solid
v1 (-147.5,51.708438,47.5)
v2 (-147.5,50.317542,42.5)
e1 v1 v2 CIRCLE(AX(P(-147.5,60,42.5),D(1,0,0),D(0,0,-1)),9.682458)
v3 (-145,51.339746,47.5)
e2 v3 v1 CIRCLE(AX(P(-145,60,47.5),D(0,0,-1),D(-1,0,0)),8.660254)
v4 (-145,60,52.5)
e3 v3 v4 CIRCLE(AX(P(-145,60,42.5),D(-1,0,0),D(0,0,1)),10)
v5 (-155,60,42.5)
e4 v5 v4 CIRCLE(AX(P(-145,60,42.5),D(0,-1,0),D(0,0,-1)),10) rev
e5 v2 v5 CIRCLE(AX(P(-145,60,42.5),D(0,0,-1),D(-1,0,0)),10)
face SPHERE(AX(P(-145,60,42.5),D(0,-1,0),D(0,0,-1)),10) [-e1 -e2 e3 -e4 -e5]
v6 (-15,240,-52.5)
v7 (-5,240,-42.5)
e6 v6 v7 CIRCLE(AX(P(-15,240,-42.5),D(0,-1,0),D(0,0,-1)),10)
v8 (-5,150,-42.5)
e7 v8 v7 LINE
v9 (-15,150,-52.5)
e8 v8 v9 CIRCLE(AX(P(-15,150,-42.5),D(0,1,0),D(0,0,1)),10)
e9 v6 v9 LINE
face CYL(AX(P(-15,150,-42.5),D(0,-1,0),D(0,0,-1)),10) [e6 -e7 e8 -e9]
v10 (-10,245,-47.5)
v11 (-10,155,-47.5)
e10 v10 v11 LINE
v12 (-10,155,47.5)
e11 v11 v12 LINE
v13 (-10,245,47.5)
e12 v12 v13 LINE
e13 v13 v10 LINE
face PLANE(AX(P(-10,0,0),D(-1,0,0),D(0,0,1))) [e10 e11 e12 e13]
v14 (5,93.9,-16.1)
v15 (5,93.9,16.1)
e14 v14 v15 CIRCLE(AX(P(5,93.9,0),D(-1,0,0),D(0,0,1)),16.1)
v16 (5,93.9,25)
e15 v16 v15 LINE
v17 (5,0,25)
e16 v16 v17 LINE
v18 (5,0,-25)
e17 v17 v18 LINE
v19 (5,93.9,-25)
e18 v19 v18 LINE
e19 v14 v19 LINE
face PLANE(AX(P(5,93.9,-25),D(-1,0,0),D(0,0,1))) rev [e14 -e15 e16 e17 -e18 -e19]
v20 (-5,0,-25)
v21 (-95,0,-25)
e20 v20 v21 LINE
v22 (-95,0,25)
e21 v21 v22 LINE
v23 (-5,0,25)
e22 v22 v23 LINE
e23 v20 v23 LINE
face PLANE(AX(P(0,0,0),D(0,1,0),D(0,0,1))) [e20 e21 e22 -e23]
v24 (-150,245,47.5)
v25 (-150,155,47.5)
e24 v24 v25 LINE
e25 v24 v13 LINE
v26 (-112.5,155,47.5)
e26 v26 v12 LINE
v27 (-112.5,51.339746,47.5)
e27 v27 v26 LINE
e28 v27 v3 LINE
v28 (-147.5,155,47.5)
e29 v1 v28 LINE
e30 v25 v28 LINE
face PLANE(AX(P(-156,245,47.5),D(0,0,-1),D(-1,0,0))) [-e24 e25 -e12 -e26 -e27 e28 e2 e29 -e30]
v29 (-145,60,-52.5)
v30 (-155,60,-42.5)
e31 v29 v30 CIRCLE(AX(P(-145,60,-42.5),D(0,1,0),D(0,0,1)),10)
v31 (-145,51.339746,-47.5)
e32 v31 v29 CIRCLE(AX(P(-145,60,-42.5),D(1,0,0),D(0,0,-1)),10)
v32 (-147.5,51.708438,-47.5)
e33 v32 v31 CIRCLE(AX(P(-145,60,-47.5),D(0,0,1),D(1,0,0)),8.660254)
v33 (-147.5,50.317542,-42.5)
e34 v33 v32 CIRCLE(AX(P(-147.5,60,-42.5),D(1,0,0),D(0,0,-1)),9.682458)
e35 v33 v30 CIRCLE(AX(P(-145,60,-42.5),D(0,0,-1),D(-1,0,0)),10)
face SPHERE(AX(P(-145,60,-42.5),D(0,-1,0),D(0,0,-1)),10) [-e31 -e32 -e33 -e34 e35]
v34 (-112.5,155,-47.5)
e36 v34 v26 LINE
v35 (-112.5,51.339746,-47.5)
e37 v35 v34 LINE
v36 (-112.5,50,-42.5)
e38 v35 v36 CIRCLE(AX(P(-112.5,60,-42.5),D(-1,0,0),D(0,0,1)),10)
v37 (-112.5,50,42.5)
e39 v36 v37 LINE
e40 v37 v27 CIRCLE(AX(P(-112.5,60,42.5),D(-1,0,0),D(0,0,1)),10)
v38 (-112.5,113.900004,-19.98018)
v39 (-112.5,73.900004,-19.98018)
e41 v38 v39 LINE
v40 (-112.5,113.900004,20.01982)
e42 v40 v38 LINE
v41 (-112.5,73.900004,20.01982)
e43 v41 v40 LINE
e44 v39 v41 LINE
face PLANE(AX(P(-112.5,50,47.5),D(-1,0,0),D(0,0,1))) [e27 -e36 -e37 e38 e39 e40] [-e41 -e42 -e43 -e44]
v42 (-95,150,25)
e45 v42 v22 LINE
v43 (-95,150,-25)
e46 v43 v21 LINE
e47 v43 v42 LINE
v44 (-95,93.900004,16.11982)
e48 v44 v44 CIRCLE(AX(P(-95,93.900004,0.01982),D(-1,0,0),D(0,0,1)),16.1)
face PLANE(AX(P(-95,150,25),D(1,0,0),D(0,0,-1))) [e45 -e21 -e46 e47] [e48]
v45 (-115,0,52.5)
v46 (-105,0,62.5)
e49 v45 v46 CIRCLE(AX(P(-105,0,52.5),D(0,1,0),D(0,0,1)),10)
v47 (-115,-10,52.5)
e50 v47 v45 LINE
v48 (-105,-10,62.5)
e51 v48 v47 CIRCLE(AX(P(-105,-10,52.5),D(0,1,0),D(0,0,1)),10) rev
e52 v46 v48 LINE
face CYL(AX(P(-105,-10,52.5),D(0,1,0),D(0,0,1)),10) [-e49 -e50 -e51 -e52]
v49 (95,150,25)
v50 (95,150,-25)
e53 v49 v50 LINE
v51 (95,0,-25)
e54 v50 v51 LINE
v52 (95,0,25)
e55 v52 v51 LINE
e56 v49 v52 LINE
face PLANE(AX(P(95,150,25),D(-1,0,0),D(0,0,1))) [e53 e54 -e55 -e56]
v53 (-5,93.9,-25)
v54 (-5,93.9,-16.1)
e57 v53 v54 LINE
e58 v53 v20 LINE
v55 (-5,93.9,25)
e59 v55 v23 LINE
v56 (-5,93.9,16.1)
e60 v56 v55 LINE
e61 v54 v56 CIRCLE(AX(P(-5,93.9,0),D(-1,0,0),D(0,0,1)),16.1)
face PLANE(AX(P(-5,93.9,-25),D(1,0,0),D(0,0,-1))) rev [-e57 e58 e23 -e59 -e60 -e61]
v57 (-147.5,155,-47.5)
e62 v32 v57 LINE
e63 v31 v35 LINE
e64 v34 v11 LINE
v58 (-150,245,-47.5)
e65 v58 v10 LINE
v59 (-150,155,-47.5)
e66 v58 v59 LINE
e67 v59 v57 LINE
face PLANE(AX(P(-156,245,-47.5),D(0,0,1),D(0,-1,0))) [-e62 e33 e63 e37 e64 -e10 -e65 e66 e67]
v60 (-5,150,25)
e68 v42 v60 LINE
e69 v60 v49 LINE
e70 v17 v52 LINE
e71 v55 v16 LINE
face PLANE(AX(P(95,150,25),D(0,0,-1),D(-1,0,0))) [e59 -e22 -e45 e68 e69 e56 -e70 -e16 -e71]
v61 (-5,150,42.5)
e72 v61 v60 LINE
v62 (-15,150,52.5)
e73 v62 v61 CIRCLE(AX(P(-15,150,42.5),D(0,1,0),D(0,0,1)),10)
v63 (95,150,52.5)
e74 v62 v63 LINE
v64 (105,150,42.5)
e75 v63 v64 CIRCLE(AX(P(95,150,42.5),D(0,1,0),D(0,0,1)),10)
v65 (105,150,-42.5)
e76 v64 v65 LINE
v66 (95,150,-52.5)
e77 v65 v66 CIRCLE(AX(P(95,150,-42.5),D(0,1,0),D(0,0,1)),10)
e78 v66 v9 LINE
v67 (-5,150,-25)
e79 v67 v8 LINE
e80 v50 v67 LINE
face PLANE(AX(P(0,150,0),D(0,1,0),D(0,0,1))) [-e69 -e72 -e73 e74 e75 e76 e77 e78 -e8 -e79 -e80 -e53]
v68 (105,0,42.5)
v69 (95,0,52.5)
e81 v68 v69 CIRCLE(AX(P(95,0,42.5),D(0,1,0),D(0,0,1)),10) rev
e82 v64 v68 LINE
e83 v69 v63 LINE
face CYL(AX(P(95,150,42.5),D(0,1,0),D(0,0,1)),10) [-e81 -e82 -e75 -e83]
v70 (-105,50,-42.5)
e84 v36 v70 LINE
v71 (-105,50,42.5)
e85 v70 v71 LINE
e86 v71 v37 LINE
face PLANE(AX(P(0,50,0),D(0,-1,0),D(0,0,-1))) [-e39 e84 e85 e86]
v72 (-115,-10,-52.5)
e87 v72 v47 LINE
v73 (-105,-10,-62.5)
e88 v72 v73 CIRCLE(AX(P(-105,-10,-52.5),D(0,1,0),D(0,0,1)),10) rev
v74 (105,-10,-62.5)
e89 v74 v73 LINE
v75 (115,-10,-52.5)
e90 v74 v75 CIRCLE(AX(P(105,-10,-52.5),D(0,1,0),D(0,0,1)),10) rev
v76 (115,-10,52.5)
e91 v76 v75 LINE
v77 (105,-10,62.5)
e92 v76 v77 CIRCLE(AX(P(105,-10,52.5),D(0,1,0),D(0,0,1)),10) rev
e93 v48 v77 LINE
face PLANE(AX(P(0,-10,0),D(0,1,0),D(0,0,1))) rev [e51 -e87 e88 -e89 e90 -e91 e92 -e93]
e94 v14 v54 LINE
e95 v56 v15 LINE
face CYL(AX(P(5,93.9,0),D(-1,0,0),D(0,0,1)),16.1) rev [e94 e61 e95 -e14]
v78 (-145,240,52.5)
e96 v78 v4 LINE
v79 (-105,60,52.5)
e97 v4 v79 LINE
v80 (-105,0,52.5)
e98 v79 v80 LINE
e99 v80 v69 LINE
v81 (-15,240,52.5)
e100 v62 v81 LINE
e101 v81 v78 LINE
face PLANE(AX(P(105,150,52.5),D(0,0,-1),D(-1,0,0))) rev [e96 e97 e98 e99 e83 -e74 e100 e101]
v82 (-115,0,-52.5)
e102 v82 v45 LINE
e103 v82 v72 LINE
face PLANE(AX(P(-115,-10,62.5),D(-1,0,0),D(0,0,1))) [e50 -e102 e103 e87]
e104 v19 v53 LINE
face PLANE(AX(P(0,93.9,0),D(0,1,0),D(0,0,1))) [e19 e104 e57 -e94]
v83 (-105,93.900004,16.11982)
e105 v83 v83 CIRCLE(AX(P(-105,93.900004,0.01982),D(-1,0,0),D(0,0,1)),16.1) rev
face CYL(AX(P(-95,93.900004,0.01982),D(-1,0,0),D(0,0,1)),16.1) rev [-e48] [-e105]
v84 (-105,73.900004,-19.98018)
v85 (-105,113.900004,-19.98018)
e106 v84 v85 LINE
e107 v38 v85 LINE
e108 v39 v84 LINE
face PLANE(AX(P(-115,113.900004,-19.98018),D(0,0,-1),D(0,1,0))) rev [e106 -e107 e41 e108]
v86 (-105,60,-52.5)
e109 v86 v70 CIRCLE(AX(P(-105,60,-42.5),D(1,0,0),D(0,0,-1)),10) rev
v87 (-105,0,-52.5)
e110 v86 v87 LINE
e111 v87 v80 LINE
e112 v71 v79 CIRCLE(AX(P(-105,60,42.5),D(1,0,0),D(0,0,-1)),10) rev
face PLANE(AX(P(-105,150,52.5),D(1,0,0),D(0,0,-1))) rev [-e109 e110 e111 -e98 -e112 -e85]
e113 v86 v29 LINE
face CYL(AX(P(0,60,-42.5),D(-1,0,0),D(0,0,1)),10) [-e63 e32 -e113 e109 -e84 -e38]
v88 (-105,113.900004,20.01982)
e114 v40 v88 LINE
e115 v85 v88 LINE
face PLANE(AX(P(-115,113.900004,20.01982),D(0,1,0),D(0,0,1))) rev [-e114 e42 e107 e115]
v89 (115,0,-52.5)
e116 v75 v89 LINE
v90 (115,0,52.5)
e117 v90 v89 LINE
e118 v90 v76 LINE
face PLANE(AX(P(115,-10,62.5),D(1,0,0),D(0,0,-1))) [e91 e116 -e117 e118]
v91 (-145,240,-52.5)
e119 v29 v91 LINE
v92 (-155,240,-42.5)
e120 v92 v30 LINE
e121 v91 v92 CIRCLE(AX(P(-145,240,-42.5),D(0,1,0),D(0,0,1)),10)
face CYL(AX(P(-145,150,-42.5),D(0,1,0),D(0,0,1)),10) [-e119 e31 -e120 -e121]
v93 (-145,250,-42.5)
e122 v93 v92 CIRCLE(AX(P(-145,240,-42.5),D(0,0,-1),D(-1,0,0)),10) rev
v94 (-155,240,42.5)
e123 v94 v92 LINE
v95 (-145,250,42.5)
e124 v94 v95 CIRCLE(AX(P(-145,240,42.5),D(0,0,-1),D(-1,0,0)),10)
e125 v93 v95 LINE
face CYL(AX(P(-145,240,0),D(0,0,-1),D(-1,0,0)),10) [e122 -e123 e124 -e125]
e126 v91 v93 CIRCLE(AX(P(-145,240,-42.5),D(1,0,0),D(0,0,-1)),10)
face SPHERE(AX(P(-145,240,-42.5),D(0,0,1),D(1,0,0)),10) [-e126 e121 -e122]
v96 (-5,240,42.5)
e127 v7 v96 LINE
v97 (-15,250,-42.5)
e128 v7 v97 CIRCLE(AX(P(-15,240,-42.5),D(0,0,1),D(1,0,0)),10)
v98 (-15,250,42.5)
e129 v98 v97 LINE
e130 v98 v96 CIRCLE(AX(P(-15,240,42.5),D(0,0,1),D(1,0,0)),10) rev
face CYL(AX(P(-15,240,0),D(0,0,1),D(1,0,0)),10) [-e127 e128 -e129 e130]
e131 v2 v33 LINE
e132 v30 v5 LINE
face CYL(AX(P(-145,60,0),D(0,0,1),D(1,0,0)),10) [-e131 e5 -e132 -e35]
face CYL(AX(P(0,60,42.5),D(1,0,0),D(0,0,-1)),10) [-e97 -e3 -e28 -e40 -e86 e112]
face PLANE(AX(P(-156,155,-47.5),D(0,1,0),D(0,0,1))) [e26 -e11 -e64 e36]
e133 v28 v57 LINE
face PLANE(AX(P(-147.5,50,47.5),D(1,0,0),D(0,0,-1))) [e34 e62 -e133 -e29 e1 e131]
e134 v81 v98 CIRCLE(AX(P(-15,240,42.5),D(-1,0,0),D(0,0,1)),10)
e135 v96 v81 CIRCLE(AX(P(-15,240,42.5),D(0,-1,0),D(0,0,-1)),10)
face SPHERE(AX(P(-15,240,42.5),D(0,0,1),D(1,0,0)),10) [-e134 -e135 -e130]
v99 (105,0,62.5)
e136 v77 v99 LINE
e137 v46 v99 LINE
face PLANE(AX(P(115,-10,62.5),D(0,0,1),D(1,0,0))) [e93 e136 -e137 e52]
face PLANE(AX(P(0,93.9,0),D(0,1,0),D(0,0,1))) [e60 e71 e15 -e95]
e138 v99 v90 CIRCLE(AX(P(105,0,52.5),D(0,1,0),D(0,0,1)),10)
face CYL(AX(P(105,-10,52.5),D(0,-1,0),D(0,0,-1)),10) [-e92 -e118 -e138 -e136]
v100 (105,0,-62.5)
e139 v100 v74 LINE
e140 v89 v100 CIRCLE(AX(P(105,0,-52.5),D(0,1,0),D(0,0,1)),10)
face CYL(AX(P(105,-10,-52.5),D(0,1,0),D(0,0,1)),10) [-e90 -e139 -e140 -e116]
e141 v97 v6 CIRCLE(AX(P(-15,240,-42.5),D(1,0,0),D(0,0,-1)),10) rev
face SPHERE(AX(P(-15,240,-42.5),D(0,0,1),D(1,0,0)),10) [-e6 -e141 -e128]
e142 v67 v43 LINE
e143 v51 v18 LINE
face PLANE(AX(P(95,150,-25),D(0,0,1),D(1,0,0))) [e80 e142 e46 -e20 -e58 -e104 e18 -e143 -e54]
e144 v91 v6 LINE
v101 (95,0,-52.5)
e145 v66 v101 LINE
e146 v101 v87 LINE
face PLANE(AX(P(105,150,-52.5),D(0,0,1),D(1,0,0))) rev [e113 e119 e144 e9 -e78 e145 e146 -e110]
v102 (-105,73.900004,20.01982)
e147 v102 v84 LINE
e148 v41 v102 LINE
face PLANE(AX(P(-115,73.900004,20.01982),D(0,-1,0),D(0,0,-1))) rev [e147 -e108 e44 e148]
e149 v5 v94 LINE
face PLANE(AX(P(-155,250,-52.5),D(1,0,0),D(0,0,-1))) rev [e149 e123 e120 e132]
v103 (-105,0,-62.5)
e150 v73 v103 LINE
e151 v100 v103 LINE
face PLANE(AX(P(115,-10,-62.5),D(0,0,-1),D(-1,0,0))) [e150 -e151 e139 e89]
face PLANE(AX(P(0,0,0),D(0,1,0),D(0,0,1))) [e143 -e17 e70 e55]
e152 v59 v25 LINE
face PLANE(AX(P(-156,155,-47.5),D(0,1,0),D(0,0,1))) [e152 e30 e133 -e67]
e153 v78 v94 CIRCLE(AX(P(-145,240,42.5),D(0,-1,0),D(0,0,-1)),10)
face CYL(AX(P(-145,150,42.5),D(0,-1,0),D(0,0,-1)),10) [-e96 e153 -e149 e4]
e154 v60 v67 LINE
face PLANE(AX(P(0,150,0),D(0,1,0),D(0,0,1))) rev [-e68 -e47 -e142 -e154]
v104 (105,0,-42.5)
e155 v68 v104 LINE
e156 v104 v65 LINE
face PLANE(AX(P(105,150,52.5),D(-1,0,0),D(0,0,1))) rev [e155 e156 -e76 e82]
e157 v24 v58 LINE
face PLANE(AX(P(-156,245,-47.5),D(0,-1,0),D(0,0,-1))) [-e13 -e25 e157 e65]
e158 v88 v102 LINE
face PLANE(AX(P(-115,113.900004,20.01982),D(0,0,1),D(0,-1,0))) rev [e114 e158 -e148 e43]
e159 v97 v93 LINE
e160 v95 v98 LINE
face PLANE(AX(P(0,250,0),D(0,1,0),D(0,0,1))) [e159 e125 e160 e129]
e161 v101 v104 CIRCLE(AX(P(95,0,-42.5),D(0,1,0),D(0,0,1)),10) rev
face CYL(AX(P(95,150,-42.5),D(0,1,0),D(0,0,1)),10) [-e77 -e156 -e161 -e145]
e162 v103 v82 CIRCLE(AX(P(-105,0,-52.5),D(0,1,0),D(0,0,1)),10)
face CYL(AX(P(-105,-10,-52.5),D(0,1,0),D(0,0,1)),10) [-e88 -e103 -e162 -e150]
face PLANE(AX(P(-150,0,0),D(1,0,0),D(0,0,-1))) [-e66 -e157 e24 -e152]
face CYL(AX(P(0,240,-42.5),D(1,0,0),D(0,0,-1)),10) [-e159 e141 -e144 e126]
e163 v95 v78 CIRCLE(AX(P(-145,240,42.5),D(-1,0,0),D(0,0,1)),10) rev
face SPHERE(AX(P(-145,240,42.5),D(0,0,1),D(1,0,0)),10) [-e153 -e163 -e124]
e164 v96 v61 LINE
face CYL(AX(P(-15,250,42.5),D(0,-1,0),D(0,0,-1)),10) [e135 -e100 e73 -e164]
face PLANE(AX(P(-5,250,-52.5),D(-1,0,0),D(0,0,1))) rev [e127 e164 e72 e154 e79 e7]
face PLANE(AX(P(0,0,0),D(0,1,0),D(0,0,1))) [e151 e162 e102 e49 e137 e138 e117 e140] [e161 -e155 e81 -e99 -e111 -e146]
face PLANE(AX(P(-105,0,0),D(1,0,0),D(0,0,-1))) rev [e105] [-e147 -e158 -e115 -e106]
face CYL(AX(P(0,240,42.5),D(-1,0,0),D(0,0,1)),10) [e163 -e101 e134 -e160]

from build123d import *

# Parameters (mm, degrees)
SKETCH2_W               = 210
SKETCH2_H               = 105
SKETCH2_W_2             = 190
SKETCH2_H_2             = 50
BOSS_EXTRUDE2_DEPTH     = 150
FILLET3_R               = 10
FILLET4_R               = 10
SKETCH4_W               = 230
SKETCH4_H               = 125
BOSS_EXTRUDE3_DEPTH     = 10
FILLET5_R               = 10
FILLET6_R               = 10
FILLET7_R               = 10
FILLET8_R               = 10
SKETCH7_W               = 10
SKETCH7_H               = 50
BOSS_EXTRUDE4_DEPTH     = 93.9
SKETCH8_R               = 16.1
CUT_EXTRUDE2_DEPTH      = 10
SKETCH10_R              = 16.1
CUT_EXTRUDE3_DEPTH      = 10
SKETCH14_W              = 150
SKETCH14_H              = 105
BOSS_EXTRUDE6_DEPTH     = 100
CUT_EXTRUDE4_DEPTH      = 1
CUT_EXTRUDE4_DEPTH_BACK = 145
SKETCH19_W              = 95
SKETCH19_H              = 90
SKETCH22_W              = 50
SKETCH22_H              = 105
SKETCH22_W_2            = 35
SKETCH22_H_2            = 95
BOSS_EXTRUDE7_DEPTH     = 100
SKETCH24_W              = 40
SKETCH24_H              = 40
CUT_EXTRUDE5_DEPTH      = 10
SKETCH25_W              = 95.055428317
SKETCH25_H              = 90
BOSS_EXTRUDE9_DEPTH     = 5
FILLET9_R               = 10
FILLET10_R              = 10
FILLET11_R              = 10
FILLET12_R              = 10
FILLET13_R              = 10
FILLET15_R              = 10
SKETCH28_W              = 35
SKETCH28_H              = 95
CUT_EXTRUDE7_DEPTH      = 5


with BuildPart() as part:
    # Sketch2 → Boss-Extrude2 (new body)
    with BuildSketch(Plane(origin=(0, 0, 0), x_dir=(1, 0, 0), z_dir=(0, 1, 0))):
        Rectangle(SKETCH2_W, SKETCH2_H)
        Rectangle(SKETCH2_W_2, SKETCH2_H_2, mode=Mode.SUBTRACT)
    extrude(amount=BOSS_EXTRUDE2_DEPTH)

    # Fillet3
    fillet3_edges = [part.edges().sort_by_distance(p)[0] for p in [
        (105, 75, 52.5),
    ]]
    fillet(fillet3_edges, radius=FILLET3_R)

    # Fillet4
    fillet4_edges = [part.edges().sort_by_distance(p)[0] for p in [
        (105, 75, -52.5),
    ]]
    fillet(fillet4_edges, radius=FILLET4_R)

    # Sketch4 → Boss-Extrude3 (add)
    with BuildSketch(Plane(origin=(0, 0, 0), x_dir=(1, 0, 0), z_dir=(0, 1, 0))):
        Rectangle(SKETCH4_W, SKETCH4_H)
    extrude(amount=-BOSS_EXTRUDE3_DEPTH)

    # Fillet5
    fillet5_edges = [part.edges().sort_by_distance(p)[0] for p in [
        (115, -5, 62.5),
    ]]
    fillet(fillet5_edges, radius=FILLET5_R)

    # Fillet6
    fillet6_edges = [part.edges().sort_by_distance(p)[0] for p in [
        (115, -5, -62.5),
    ]]
    fillet(fillet6_edges, radius=FILLET6_R)

    # Fillet7
    fillet7_edges = [part.edges().sort_by_distance(p)[0] for p in [
        (-115, -5, -62.5),
    ]]
    fillet(fillet7_edges, radius=FILLET7_R)

    # Fillet8
    fillet8_edges = [part.edges().sort_by_distance(p)[0] for p in [
        (-115, -5, 62.5),
    ]]
    fillet(fillet8_edges, radius=FILLET8_R)

    # Sketch7 → Boss-Extrude4 (add)
    with BuildSketch(Plane(origin=(0, 0, 0), x_dir=(1, 0, 0), z_dir=(0, 1, 0))):
        Rectangle(SKETCH7_W, SKETCH7_H)
    extrude(amount=BOSS_EXTRUDE4_DEPTH)

    # Sketch8 → Cut-Extrude2 (cut)
    with BuildSketch(Plane.ZY.offset(5)):
        with Locations((0, 93.9)):
            Circle(SKETCH8_R)
    extrude(amount=-CUT_EXTRUDE2_DEPTH, mode=Mode.SUBTRACT)

    # Sketch10 → Cut-Extrude3 (cut)
    with BuildSketch(Plane.ZY.offset(105)):
        with Locations((0.019819576, 93.900003501)):
            Circle(SKETCH10_R)
    extrude(amount=-CUT_EXTRUDE3_DEPTH, mode=Mode.SUBTRACT)

    # Sketch14 → Boss-Extrude6 (add)
    with BuildSketch(Plane(origin=(0, 150, 0), x_dir=(1, 0, 0), z_dir=(0, 1, 0))):
        with Locations((-80, 0)):
            Rectangle(SKETCH14_W, SKETCH14_H)
    extrude(amount=BOSS_EXTRUDE6_DEPTH)

    # Sketch19 → Cut-Extrude4 (cut, two sides: drawn at the far end of the back side and taken through both)
    with BuildSketch(Plane.ZY.offset(155).offset(-CUT_EXTRUDE4_DEPTH_BACK)):
        with Locations((0, 200)):
            Rectangle(SKETCH19_W, SKETCH19_H)
    extrude(amount=CUT_EXTRUDE4_DEPTH + CUT_EXTRUDE4_DEPTH_BACK, mode=Mode.SUBTRACT)

    # Sketch22 → Boss-Extrude7 (add)
    with BuildSketch(Plane.XZ.offset(-150)):
        with Locations((-130, 0)):
            Rectangle(SKETCH22_W, SKETCH22_H)
        with Locations((-130, 0)):
            Rectangle(SKETCH22_W_2, SKETCH22_H_2, mode=Mode.SUBTRACT)
    extrude(amount=BOSS_EXTRUDE7_DEPTH)

    # Sketch24 → Cut-Extrude5 (cut)
    with BuildSketch(Plane(origin=(-105, 0, 0), x_dir=(0, 0, -1), z_dir=(1, 0, 0))):
        with Locations((-0.019819576, 93.900003501)):
            Rectangle(SKETCH24_W, SKETCH24_H)
    extrude(amount=-CUT_EXTRUDE5_DEPTH, mode=Mode.SUBTRACT)

    # Sketch25 → Boss-Extrude9 (add)
    with BuildSketch(Plane.ZY.offset(155)):
        with Locations((0.027714159, 200)):
            Rectangle(SKETCH25_W, SKETCH25_H)
    extrude(amount=-BOSS_EXTRUDE9_DEPTH)

    # Fillet9
    fillet9_edges = [part.edges().sort_by_distance(p)[0] for p in [
        (-80, 250, -52.5),
        (-155, 250, 0),
        (-80, 250, 52.5),
        (-5, 250, 0),
    ]]
    fillet(fillet9_edges, radius=FILLET9_R)

    # Fillet10
    # the kernel refuses this fillet: 10 mm, written as the material it takes off along each edge
    with BuildSketch(Plane(origin=(-145, 240, 42.5), x_dir=(-1, 0, 0), z_dir=(0, 0, 1))) as fillet10_piece_1_section:
        Polygon((0, 0), (FILLET10_R, 0), (FILLET10_R, -FILLET10_R), (0, -FILLET10_R), align=None)
    fillet10_piece_1 = extrude(amount=FILLET10_R, mode=Mode.PRIVATE)
    fillet10_piece_1 = fillet10_piece_1 - Plane(origin=(-145, 240, 42.5), x_dir=(0.7071067811865475, -0.7071067811865475, 0), z_dir=(0, 0, 1)) * Sphere(FILLET10_R, mode=Mode.PRIVATE)
    add(fillet10_piece_1, mode=Mode.SUBTRACT)
    with BuildSketch(Plane(origin=(-155, 240, 52.5), x_dir=(1, 0, 0), z_dir=(0, -1, 0))) as fillet10_piece_2:
        with BuildLine():
            CenterArc((FILLET10_R, -FILLET10_R), FILLET10_R, 90, 90)
            Line((0, -FILLET10_R), (0, 0))
            Line((0, 0), (FILLET10_R, 0))
        make_face()
    extrude(amount=215, mode=Mode.SUBTRACT)

    # Fillet11
    # the kernel refuses this fillet: 10 mm, written as the material it takes off along each edge
    with BuildSketch(Plane(origin=(-145, 240, -42.5), x_dir=(-1, 0, 0), z_dir=(0, 0, -1))) as fillet11_piece_1_section:
        Polygon((0, 0), (FILLET11_R, 0), (FILLET11_R, FILLET11_R), (0, FILLET11_R), align=None)
    fillet11_piece_1 = extrude(amount=FILLET11_R, mode=Mode.PRIVATE)
    fillet11_piece_1 = fillet11_piece_1 - Plane(origin=(-145, 240, -42.5), x_dir=(0.7071067811865475, -0.7071067811865475, 0), z_dir=(0, 0, -1)) * Sphere(FILLET11_R, mode=Mode.PRIVATE)
    add(fillet11_piece_1, mode=Mode.SUBTRACT)
    with BuildSketch(Plane(origin=(-155, 25, -52.5), x_dir=(1, 0, 0), z_dir=(0, 1, 0))) as fillet11_piece_2:
        with BuildLine():
            CenterArc((FILLET11_R, -FILLET11_R), FILLET11_R, 90, 90)
            Line((0, -FILLET11_R), (0, 0))
            Line((0, 0), (FILLET11_R, 0))
        make_face()
    extrude(amount=215, mode=Mode.SUBTRACT)

    # Fillet12
    # the kernel refuses this fillet: 10 mm, written as the material it takes off along each edge
    with BuildSketch(Plane(origin=(-15, 240, 42.5), x_dir=(1, 0, 0), z_dir=(0, 0, 1))) as fillet12_piece_1_section:
        Polygon((0, 0), (FILLET12_R, 0), (FILLET12_R, FILLET12_R), (0, FILLET12_R), align=None)
    fillet12_piece_1 = extrude(amount=FILLET12_R, mode=Mode.PRIVATE)
    fillet12_piece_1 = fillet12_piece_1 - Plane(origin=(-15, 240, 42.5), x_dir=(-0.7071067811865475, -0.7071067811865475, 0), z_dir=(0, 0, 1)) * Sphere(FILLET12_R, mode=Mode.PRIVATE)
    add(fillet12_piece_1, mode=Mode.SUBTRACT)
    with BuildSketch(Plane(origin=(-5, 150, 52.5), x_dir=(-1, 0, 0), z_dir=(0, 1, 0))) as fillet12_piece_2:
        with BuildLine():
            CenterArc((FILLET12_R, -FILLET12_R), FILLET12_R, 90, 90)
            Line((0, -FILLET12_R), (0, 0))
            Line((0, 0), (FILLET12_R, 0))
        make_face()
    extrude(amount=90, mode=Mode.SUBTRACT)

    # Fillet13
    # the kernel refuses this fillet: 10 mm, written as the material it takes off along each edge
    with BuildSketch(Plane(origin=(-15, 240, -42.5), x_dir=(1, 0, 0), z_dir=(0, 0, -1))) as fillet13_piece_1_section:
        Polygon((0, 0), (FILLET13_R, 0), (FILLET13_R, -FILLET13_R), (0, -FILLET13_R), align=None)
    fillet13_piece_1 = extrude(amount=FILLET13_R, mode=Mode.PRIVATE)
    fillet13_piece_1 = fillet13_piece_1 - Plane(origin=(-15, 240, -42.5), x_dir=(-0.7071067811865475, -0.7071067811865475, 0), z_dir=(0, 0, -1)) * Sphere(FILLET13_R, mode=Mode.PRIVATE)
    add(fillet13_piece_1, mode=Mode.SUBTRACT)
    with BuildSketch(Plane(origin=(-5, 150, -52.5), x_dir=(-1, 0, 0), z_dir=(0, 1, 0))) as fillet13_piece_2:
        with BuildLine():
            CenterArc((FILLET13_R, FILLET13_R), FILLET13_R, 180, 90)
            Line((0, FILLET13_R), (0, 0))
            Line((0, 0), (FILLET13_R, 0))
        make_face()
    extrude(amount=90, mode=Mode.SUBTRACT)

    # Fillet15
    # the kernel refuses this fillet: 10 mm, written as the material it takes off along each edge
    with BuildSketch(Plane(origin=(-145, 50, 52.5), x_dir=(0, 1, 0), z_dir=(1, 0, 0)), Plane(origin=(-105, 50, -52.5), x_dir=(0, 1, 0), z_dir=(-1, 0, 0))) as fillet15_piece_1:
        with BuildLine():
            CenterArc((FILLET15_R, -FILLET15_R), FILLET15_R, 90, 90)
            Line((0, -FILLET15_R), (0, 0))
            Line((0, 0), (FILLET15_R, 0))
        make_face()
    extrude(amount=40, mode=Mode.SUBTRACT)
    with BuildSketch(Plane(origin=(-155, 50, -42.5), x_dir=(0, 1, 0), z_dir=(0, 0, 1))) as fillet15_piece_2:
        with BuildLine():
            CenterArc((FILLET15_R, -FILLET15_R), FILLET15_R, 90, 90)
            Line((0, -FILLET15_R), (0, 0))
            Line((0, 0), (FILLET15_R, 0))
        make_face()
    extrude(amount=85, mode=Mode.SUBTRACT)
    with BuildSketch(Plane(origin=(-145, 50, 42.5), x_dir=(-1, 0, 0), z_dir=(0, 0, -1))) as fillet15_piece_3:
        with BuildLine():
            CenterArc((10 - FILLET15_R, FILLET15_R), FILLET15_R, 270, 90)
            Line((10, FILLET15_R), (10, 0))
            Line((10, 0), (10 - FILLET15_R, 0))
        make_face()
    revolve(axis=Axis((-145, 50, 42.5), (0, 1, 0)), revolution_arc=90, mode=Mode.SUBTRACT)
    with BuildSketch(Plane(origin=(-145, 50, -42.5), x_dir=(-1, 0, 0), z_dir=(0, 0, 1))) as fillet15_piece_4:
        with BuildLine():
            CenterArc((10 - FILLET15_R, -FILLET15_R), FILLET15_R, 0, 90)
            Line((10 - FILLET15_R, 0), (10, 0))
            Line((10, 0), (10, -FILLET15_R))
        make_face()
    revolve(axis=Axis((-145, 50, -42.5), (0, -1, 0)), revolution_arc=90, mode=Mode.SUBTRACT)

    # Sketch28 → Cut-Extrude7 (cut)
    with BuildSketch(Plane.XZ.offset(-150)):
        with Locations((-130, 0)):
            Rectangle(SKETCH28_W, SKETCH28_H)
    extrude(amount=-CUT_EXTRUDE7_DEPTH, mode=Mode.SUBTRACT)


solid = part.part
